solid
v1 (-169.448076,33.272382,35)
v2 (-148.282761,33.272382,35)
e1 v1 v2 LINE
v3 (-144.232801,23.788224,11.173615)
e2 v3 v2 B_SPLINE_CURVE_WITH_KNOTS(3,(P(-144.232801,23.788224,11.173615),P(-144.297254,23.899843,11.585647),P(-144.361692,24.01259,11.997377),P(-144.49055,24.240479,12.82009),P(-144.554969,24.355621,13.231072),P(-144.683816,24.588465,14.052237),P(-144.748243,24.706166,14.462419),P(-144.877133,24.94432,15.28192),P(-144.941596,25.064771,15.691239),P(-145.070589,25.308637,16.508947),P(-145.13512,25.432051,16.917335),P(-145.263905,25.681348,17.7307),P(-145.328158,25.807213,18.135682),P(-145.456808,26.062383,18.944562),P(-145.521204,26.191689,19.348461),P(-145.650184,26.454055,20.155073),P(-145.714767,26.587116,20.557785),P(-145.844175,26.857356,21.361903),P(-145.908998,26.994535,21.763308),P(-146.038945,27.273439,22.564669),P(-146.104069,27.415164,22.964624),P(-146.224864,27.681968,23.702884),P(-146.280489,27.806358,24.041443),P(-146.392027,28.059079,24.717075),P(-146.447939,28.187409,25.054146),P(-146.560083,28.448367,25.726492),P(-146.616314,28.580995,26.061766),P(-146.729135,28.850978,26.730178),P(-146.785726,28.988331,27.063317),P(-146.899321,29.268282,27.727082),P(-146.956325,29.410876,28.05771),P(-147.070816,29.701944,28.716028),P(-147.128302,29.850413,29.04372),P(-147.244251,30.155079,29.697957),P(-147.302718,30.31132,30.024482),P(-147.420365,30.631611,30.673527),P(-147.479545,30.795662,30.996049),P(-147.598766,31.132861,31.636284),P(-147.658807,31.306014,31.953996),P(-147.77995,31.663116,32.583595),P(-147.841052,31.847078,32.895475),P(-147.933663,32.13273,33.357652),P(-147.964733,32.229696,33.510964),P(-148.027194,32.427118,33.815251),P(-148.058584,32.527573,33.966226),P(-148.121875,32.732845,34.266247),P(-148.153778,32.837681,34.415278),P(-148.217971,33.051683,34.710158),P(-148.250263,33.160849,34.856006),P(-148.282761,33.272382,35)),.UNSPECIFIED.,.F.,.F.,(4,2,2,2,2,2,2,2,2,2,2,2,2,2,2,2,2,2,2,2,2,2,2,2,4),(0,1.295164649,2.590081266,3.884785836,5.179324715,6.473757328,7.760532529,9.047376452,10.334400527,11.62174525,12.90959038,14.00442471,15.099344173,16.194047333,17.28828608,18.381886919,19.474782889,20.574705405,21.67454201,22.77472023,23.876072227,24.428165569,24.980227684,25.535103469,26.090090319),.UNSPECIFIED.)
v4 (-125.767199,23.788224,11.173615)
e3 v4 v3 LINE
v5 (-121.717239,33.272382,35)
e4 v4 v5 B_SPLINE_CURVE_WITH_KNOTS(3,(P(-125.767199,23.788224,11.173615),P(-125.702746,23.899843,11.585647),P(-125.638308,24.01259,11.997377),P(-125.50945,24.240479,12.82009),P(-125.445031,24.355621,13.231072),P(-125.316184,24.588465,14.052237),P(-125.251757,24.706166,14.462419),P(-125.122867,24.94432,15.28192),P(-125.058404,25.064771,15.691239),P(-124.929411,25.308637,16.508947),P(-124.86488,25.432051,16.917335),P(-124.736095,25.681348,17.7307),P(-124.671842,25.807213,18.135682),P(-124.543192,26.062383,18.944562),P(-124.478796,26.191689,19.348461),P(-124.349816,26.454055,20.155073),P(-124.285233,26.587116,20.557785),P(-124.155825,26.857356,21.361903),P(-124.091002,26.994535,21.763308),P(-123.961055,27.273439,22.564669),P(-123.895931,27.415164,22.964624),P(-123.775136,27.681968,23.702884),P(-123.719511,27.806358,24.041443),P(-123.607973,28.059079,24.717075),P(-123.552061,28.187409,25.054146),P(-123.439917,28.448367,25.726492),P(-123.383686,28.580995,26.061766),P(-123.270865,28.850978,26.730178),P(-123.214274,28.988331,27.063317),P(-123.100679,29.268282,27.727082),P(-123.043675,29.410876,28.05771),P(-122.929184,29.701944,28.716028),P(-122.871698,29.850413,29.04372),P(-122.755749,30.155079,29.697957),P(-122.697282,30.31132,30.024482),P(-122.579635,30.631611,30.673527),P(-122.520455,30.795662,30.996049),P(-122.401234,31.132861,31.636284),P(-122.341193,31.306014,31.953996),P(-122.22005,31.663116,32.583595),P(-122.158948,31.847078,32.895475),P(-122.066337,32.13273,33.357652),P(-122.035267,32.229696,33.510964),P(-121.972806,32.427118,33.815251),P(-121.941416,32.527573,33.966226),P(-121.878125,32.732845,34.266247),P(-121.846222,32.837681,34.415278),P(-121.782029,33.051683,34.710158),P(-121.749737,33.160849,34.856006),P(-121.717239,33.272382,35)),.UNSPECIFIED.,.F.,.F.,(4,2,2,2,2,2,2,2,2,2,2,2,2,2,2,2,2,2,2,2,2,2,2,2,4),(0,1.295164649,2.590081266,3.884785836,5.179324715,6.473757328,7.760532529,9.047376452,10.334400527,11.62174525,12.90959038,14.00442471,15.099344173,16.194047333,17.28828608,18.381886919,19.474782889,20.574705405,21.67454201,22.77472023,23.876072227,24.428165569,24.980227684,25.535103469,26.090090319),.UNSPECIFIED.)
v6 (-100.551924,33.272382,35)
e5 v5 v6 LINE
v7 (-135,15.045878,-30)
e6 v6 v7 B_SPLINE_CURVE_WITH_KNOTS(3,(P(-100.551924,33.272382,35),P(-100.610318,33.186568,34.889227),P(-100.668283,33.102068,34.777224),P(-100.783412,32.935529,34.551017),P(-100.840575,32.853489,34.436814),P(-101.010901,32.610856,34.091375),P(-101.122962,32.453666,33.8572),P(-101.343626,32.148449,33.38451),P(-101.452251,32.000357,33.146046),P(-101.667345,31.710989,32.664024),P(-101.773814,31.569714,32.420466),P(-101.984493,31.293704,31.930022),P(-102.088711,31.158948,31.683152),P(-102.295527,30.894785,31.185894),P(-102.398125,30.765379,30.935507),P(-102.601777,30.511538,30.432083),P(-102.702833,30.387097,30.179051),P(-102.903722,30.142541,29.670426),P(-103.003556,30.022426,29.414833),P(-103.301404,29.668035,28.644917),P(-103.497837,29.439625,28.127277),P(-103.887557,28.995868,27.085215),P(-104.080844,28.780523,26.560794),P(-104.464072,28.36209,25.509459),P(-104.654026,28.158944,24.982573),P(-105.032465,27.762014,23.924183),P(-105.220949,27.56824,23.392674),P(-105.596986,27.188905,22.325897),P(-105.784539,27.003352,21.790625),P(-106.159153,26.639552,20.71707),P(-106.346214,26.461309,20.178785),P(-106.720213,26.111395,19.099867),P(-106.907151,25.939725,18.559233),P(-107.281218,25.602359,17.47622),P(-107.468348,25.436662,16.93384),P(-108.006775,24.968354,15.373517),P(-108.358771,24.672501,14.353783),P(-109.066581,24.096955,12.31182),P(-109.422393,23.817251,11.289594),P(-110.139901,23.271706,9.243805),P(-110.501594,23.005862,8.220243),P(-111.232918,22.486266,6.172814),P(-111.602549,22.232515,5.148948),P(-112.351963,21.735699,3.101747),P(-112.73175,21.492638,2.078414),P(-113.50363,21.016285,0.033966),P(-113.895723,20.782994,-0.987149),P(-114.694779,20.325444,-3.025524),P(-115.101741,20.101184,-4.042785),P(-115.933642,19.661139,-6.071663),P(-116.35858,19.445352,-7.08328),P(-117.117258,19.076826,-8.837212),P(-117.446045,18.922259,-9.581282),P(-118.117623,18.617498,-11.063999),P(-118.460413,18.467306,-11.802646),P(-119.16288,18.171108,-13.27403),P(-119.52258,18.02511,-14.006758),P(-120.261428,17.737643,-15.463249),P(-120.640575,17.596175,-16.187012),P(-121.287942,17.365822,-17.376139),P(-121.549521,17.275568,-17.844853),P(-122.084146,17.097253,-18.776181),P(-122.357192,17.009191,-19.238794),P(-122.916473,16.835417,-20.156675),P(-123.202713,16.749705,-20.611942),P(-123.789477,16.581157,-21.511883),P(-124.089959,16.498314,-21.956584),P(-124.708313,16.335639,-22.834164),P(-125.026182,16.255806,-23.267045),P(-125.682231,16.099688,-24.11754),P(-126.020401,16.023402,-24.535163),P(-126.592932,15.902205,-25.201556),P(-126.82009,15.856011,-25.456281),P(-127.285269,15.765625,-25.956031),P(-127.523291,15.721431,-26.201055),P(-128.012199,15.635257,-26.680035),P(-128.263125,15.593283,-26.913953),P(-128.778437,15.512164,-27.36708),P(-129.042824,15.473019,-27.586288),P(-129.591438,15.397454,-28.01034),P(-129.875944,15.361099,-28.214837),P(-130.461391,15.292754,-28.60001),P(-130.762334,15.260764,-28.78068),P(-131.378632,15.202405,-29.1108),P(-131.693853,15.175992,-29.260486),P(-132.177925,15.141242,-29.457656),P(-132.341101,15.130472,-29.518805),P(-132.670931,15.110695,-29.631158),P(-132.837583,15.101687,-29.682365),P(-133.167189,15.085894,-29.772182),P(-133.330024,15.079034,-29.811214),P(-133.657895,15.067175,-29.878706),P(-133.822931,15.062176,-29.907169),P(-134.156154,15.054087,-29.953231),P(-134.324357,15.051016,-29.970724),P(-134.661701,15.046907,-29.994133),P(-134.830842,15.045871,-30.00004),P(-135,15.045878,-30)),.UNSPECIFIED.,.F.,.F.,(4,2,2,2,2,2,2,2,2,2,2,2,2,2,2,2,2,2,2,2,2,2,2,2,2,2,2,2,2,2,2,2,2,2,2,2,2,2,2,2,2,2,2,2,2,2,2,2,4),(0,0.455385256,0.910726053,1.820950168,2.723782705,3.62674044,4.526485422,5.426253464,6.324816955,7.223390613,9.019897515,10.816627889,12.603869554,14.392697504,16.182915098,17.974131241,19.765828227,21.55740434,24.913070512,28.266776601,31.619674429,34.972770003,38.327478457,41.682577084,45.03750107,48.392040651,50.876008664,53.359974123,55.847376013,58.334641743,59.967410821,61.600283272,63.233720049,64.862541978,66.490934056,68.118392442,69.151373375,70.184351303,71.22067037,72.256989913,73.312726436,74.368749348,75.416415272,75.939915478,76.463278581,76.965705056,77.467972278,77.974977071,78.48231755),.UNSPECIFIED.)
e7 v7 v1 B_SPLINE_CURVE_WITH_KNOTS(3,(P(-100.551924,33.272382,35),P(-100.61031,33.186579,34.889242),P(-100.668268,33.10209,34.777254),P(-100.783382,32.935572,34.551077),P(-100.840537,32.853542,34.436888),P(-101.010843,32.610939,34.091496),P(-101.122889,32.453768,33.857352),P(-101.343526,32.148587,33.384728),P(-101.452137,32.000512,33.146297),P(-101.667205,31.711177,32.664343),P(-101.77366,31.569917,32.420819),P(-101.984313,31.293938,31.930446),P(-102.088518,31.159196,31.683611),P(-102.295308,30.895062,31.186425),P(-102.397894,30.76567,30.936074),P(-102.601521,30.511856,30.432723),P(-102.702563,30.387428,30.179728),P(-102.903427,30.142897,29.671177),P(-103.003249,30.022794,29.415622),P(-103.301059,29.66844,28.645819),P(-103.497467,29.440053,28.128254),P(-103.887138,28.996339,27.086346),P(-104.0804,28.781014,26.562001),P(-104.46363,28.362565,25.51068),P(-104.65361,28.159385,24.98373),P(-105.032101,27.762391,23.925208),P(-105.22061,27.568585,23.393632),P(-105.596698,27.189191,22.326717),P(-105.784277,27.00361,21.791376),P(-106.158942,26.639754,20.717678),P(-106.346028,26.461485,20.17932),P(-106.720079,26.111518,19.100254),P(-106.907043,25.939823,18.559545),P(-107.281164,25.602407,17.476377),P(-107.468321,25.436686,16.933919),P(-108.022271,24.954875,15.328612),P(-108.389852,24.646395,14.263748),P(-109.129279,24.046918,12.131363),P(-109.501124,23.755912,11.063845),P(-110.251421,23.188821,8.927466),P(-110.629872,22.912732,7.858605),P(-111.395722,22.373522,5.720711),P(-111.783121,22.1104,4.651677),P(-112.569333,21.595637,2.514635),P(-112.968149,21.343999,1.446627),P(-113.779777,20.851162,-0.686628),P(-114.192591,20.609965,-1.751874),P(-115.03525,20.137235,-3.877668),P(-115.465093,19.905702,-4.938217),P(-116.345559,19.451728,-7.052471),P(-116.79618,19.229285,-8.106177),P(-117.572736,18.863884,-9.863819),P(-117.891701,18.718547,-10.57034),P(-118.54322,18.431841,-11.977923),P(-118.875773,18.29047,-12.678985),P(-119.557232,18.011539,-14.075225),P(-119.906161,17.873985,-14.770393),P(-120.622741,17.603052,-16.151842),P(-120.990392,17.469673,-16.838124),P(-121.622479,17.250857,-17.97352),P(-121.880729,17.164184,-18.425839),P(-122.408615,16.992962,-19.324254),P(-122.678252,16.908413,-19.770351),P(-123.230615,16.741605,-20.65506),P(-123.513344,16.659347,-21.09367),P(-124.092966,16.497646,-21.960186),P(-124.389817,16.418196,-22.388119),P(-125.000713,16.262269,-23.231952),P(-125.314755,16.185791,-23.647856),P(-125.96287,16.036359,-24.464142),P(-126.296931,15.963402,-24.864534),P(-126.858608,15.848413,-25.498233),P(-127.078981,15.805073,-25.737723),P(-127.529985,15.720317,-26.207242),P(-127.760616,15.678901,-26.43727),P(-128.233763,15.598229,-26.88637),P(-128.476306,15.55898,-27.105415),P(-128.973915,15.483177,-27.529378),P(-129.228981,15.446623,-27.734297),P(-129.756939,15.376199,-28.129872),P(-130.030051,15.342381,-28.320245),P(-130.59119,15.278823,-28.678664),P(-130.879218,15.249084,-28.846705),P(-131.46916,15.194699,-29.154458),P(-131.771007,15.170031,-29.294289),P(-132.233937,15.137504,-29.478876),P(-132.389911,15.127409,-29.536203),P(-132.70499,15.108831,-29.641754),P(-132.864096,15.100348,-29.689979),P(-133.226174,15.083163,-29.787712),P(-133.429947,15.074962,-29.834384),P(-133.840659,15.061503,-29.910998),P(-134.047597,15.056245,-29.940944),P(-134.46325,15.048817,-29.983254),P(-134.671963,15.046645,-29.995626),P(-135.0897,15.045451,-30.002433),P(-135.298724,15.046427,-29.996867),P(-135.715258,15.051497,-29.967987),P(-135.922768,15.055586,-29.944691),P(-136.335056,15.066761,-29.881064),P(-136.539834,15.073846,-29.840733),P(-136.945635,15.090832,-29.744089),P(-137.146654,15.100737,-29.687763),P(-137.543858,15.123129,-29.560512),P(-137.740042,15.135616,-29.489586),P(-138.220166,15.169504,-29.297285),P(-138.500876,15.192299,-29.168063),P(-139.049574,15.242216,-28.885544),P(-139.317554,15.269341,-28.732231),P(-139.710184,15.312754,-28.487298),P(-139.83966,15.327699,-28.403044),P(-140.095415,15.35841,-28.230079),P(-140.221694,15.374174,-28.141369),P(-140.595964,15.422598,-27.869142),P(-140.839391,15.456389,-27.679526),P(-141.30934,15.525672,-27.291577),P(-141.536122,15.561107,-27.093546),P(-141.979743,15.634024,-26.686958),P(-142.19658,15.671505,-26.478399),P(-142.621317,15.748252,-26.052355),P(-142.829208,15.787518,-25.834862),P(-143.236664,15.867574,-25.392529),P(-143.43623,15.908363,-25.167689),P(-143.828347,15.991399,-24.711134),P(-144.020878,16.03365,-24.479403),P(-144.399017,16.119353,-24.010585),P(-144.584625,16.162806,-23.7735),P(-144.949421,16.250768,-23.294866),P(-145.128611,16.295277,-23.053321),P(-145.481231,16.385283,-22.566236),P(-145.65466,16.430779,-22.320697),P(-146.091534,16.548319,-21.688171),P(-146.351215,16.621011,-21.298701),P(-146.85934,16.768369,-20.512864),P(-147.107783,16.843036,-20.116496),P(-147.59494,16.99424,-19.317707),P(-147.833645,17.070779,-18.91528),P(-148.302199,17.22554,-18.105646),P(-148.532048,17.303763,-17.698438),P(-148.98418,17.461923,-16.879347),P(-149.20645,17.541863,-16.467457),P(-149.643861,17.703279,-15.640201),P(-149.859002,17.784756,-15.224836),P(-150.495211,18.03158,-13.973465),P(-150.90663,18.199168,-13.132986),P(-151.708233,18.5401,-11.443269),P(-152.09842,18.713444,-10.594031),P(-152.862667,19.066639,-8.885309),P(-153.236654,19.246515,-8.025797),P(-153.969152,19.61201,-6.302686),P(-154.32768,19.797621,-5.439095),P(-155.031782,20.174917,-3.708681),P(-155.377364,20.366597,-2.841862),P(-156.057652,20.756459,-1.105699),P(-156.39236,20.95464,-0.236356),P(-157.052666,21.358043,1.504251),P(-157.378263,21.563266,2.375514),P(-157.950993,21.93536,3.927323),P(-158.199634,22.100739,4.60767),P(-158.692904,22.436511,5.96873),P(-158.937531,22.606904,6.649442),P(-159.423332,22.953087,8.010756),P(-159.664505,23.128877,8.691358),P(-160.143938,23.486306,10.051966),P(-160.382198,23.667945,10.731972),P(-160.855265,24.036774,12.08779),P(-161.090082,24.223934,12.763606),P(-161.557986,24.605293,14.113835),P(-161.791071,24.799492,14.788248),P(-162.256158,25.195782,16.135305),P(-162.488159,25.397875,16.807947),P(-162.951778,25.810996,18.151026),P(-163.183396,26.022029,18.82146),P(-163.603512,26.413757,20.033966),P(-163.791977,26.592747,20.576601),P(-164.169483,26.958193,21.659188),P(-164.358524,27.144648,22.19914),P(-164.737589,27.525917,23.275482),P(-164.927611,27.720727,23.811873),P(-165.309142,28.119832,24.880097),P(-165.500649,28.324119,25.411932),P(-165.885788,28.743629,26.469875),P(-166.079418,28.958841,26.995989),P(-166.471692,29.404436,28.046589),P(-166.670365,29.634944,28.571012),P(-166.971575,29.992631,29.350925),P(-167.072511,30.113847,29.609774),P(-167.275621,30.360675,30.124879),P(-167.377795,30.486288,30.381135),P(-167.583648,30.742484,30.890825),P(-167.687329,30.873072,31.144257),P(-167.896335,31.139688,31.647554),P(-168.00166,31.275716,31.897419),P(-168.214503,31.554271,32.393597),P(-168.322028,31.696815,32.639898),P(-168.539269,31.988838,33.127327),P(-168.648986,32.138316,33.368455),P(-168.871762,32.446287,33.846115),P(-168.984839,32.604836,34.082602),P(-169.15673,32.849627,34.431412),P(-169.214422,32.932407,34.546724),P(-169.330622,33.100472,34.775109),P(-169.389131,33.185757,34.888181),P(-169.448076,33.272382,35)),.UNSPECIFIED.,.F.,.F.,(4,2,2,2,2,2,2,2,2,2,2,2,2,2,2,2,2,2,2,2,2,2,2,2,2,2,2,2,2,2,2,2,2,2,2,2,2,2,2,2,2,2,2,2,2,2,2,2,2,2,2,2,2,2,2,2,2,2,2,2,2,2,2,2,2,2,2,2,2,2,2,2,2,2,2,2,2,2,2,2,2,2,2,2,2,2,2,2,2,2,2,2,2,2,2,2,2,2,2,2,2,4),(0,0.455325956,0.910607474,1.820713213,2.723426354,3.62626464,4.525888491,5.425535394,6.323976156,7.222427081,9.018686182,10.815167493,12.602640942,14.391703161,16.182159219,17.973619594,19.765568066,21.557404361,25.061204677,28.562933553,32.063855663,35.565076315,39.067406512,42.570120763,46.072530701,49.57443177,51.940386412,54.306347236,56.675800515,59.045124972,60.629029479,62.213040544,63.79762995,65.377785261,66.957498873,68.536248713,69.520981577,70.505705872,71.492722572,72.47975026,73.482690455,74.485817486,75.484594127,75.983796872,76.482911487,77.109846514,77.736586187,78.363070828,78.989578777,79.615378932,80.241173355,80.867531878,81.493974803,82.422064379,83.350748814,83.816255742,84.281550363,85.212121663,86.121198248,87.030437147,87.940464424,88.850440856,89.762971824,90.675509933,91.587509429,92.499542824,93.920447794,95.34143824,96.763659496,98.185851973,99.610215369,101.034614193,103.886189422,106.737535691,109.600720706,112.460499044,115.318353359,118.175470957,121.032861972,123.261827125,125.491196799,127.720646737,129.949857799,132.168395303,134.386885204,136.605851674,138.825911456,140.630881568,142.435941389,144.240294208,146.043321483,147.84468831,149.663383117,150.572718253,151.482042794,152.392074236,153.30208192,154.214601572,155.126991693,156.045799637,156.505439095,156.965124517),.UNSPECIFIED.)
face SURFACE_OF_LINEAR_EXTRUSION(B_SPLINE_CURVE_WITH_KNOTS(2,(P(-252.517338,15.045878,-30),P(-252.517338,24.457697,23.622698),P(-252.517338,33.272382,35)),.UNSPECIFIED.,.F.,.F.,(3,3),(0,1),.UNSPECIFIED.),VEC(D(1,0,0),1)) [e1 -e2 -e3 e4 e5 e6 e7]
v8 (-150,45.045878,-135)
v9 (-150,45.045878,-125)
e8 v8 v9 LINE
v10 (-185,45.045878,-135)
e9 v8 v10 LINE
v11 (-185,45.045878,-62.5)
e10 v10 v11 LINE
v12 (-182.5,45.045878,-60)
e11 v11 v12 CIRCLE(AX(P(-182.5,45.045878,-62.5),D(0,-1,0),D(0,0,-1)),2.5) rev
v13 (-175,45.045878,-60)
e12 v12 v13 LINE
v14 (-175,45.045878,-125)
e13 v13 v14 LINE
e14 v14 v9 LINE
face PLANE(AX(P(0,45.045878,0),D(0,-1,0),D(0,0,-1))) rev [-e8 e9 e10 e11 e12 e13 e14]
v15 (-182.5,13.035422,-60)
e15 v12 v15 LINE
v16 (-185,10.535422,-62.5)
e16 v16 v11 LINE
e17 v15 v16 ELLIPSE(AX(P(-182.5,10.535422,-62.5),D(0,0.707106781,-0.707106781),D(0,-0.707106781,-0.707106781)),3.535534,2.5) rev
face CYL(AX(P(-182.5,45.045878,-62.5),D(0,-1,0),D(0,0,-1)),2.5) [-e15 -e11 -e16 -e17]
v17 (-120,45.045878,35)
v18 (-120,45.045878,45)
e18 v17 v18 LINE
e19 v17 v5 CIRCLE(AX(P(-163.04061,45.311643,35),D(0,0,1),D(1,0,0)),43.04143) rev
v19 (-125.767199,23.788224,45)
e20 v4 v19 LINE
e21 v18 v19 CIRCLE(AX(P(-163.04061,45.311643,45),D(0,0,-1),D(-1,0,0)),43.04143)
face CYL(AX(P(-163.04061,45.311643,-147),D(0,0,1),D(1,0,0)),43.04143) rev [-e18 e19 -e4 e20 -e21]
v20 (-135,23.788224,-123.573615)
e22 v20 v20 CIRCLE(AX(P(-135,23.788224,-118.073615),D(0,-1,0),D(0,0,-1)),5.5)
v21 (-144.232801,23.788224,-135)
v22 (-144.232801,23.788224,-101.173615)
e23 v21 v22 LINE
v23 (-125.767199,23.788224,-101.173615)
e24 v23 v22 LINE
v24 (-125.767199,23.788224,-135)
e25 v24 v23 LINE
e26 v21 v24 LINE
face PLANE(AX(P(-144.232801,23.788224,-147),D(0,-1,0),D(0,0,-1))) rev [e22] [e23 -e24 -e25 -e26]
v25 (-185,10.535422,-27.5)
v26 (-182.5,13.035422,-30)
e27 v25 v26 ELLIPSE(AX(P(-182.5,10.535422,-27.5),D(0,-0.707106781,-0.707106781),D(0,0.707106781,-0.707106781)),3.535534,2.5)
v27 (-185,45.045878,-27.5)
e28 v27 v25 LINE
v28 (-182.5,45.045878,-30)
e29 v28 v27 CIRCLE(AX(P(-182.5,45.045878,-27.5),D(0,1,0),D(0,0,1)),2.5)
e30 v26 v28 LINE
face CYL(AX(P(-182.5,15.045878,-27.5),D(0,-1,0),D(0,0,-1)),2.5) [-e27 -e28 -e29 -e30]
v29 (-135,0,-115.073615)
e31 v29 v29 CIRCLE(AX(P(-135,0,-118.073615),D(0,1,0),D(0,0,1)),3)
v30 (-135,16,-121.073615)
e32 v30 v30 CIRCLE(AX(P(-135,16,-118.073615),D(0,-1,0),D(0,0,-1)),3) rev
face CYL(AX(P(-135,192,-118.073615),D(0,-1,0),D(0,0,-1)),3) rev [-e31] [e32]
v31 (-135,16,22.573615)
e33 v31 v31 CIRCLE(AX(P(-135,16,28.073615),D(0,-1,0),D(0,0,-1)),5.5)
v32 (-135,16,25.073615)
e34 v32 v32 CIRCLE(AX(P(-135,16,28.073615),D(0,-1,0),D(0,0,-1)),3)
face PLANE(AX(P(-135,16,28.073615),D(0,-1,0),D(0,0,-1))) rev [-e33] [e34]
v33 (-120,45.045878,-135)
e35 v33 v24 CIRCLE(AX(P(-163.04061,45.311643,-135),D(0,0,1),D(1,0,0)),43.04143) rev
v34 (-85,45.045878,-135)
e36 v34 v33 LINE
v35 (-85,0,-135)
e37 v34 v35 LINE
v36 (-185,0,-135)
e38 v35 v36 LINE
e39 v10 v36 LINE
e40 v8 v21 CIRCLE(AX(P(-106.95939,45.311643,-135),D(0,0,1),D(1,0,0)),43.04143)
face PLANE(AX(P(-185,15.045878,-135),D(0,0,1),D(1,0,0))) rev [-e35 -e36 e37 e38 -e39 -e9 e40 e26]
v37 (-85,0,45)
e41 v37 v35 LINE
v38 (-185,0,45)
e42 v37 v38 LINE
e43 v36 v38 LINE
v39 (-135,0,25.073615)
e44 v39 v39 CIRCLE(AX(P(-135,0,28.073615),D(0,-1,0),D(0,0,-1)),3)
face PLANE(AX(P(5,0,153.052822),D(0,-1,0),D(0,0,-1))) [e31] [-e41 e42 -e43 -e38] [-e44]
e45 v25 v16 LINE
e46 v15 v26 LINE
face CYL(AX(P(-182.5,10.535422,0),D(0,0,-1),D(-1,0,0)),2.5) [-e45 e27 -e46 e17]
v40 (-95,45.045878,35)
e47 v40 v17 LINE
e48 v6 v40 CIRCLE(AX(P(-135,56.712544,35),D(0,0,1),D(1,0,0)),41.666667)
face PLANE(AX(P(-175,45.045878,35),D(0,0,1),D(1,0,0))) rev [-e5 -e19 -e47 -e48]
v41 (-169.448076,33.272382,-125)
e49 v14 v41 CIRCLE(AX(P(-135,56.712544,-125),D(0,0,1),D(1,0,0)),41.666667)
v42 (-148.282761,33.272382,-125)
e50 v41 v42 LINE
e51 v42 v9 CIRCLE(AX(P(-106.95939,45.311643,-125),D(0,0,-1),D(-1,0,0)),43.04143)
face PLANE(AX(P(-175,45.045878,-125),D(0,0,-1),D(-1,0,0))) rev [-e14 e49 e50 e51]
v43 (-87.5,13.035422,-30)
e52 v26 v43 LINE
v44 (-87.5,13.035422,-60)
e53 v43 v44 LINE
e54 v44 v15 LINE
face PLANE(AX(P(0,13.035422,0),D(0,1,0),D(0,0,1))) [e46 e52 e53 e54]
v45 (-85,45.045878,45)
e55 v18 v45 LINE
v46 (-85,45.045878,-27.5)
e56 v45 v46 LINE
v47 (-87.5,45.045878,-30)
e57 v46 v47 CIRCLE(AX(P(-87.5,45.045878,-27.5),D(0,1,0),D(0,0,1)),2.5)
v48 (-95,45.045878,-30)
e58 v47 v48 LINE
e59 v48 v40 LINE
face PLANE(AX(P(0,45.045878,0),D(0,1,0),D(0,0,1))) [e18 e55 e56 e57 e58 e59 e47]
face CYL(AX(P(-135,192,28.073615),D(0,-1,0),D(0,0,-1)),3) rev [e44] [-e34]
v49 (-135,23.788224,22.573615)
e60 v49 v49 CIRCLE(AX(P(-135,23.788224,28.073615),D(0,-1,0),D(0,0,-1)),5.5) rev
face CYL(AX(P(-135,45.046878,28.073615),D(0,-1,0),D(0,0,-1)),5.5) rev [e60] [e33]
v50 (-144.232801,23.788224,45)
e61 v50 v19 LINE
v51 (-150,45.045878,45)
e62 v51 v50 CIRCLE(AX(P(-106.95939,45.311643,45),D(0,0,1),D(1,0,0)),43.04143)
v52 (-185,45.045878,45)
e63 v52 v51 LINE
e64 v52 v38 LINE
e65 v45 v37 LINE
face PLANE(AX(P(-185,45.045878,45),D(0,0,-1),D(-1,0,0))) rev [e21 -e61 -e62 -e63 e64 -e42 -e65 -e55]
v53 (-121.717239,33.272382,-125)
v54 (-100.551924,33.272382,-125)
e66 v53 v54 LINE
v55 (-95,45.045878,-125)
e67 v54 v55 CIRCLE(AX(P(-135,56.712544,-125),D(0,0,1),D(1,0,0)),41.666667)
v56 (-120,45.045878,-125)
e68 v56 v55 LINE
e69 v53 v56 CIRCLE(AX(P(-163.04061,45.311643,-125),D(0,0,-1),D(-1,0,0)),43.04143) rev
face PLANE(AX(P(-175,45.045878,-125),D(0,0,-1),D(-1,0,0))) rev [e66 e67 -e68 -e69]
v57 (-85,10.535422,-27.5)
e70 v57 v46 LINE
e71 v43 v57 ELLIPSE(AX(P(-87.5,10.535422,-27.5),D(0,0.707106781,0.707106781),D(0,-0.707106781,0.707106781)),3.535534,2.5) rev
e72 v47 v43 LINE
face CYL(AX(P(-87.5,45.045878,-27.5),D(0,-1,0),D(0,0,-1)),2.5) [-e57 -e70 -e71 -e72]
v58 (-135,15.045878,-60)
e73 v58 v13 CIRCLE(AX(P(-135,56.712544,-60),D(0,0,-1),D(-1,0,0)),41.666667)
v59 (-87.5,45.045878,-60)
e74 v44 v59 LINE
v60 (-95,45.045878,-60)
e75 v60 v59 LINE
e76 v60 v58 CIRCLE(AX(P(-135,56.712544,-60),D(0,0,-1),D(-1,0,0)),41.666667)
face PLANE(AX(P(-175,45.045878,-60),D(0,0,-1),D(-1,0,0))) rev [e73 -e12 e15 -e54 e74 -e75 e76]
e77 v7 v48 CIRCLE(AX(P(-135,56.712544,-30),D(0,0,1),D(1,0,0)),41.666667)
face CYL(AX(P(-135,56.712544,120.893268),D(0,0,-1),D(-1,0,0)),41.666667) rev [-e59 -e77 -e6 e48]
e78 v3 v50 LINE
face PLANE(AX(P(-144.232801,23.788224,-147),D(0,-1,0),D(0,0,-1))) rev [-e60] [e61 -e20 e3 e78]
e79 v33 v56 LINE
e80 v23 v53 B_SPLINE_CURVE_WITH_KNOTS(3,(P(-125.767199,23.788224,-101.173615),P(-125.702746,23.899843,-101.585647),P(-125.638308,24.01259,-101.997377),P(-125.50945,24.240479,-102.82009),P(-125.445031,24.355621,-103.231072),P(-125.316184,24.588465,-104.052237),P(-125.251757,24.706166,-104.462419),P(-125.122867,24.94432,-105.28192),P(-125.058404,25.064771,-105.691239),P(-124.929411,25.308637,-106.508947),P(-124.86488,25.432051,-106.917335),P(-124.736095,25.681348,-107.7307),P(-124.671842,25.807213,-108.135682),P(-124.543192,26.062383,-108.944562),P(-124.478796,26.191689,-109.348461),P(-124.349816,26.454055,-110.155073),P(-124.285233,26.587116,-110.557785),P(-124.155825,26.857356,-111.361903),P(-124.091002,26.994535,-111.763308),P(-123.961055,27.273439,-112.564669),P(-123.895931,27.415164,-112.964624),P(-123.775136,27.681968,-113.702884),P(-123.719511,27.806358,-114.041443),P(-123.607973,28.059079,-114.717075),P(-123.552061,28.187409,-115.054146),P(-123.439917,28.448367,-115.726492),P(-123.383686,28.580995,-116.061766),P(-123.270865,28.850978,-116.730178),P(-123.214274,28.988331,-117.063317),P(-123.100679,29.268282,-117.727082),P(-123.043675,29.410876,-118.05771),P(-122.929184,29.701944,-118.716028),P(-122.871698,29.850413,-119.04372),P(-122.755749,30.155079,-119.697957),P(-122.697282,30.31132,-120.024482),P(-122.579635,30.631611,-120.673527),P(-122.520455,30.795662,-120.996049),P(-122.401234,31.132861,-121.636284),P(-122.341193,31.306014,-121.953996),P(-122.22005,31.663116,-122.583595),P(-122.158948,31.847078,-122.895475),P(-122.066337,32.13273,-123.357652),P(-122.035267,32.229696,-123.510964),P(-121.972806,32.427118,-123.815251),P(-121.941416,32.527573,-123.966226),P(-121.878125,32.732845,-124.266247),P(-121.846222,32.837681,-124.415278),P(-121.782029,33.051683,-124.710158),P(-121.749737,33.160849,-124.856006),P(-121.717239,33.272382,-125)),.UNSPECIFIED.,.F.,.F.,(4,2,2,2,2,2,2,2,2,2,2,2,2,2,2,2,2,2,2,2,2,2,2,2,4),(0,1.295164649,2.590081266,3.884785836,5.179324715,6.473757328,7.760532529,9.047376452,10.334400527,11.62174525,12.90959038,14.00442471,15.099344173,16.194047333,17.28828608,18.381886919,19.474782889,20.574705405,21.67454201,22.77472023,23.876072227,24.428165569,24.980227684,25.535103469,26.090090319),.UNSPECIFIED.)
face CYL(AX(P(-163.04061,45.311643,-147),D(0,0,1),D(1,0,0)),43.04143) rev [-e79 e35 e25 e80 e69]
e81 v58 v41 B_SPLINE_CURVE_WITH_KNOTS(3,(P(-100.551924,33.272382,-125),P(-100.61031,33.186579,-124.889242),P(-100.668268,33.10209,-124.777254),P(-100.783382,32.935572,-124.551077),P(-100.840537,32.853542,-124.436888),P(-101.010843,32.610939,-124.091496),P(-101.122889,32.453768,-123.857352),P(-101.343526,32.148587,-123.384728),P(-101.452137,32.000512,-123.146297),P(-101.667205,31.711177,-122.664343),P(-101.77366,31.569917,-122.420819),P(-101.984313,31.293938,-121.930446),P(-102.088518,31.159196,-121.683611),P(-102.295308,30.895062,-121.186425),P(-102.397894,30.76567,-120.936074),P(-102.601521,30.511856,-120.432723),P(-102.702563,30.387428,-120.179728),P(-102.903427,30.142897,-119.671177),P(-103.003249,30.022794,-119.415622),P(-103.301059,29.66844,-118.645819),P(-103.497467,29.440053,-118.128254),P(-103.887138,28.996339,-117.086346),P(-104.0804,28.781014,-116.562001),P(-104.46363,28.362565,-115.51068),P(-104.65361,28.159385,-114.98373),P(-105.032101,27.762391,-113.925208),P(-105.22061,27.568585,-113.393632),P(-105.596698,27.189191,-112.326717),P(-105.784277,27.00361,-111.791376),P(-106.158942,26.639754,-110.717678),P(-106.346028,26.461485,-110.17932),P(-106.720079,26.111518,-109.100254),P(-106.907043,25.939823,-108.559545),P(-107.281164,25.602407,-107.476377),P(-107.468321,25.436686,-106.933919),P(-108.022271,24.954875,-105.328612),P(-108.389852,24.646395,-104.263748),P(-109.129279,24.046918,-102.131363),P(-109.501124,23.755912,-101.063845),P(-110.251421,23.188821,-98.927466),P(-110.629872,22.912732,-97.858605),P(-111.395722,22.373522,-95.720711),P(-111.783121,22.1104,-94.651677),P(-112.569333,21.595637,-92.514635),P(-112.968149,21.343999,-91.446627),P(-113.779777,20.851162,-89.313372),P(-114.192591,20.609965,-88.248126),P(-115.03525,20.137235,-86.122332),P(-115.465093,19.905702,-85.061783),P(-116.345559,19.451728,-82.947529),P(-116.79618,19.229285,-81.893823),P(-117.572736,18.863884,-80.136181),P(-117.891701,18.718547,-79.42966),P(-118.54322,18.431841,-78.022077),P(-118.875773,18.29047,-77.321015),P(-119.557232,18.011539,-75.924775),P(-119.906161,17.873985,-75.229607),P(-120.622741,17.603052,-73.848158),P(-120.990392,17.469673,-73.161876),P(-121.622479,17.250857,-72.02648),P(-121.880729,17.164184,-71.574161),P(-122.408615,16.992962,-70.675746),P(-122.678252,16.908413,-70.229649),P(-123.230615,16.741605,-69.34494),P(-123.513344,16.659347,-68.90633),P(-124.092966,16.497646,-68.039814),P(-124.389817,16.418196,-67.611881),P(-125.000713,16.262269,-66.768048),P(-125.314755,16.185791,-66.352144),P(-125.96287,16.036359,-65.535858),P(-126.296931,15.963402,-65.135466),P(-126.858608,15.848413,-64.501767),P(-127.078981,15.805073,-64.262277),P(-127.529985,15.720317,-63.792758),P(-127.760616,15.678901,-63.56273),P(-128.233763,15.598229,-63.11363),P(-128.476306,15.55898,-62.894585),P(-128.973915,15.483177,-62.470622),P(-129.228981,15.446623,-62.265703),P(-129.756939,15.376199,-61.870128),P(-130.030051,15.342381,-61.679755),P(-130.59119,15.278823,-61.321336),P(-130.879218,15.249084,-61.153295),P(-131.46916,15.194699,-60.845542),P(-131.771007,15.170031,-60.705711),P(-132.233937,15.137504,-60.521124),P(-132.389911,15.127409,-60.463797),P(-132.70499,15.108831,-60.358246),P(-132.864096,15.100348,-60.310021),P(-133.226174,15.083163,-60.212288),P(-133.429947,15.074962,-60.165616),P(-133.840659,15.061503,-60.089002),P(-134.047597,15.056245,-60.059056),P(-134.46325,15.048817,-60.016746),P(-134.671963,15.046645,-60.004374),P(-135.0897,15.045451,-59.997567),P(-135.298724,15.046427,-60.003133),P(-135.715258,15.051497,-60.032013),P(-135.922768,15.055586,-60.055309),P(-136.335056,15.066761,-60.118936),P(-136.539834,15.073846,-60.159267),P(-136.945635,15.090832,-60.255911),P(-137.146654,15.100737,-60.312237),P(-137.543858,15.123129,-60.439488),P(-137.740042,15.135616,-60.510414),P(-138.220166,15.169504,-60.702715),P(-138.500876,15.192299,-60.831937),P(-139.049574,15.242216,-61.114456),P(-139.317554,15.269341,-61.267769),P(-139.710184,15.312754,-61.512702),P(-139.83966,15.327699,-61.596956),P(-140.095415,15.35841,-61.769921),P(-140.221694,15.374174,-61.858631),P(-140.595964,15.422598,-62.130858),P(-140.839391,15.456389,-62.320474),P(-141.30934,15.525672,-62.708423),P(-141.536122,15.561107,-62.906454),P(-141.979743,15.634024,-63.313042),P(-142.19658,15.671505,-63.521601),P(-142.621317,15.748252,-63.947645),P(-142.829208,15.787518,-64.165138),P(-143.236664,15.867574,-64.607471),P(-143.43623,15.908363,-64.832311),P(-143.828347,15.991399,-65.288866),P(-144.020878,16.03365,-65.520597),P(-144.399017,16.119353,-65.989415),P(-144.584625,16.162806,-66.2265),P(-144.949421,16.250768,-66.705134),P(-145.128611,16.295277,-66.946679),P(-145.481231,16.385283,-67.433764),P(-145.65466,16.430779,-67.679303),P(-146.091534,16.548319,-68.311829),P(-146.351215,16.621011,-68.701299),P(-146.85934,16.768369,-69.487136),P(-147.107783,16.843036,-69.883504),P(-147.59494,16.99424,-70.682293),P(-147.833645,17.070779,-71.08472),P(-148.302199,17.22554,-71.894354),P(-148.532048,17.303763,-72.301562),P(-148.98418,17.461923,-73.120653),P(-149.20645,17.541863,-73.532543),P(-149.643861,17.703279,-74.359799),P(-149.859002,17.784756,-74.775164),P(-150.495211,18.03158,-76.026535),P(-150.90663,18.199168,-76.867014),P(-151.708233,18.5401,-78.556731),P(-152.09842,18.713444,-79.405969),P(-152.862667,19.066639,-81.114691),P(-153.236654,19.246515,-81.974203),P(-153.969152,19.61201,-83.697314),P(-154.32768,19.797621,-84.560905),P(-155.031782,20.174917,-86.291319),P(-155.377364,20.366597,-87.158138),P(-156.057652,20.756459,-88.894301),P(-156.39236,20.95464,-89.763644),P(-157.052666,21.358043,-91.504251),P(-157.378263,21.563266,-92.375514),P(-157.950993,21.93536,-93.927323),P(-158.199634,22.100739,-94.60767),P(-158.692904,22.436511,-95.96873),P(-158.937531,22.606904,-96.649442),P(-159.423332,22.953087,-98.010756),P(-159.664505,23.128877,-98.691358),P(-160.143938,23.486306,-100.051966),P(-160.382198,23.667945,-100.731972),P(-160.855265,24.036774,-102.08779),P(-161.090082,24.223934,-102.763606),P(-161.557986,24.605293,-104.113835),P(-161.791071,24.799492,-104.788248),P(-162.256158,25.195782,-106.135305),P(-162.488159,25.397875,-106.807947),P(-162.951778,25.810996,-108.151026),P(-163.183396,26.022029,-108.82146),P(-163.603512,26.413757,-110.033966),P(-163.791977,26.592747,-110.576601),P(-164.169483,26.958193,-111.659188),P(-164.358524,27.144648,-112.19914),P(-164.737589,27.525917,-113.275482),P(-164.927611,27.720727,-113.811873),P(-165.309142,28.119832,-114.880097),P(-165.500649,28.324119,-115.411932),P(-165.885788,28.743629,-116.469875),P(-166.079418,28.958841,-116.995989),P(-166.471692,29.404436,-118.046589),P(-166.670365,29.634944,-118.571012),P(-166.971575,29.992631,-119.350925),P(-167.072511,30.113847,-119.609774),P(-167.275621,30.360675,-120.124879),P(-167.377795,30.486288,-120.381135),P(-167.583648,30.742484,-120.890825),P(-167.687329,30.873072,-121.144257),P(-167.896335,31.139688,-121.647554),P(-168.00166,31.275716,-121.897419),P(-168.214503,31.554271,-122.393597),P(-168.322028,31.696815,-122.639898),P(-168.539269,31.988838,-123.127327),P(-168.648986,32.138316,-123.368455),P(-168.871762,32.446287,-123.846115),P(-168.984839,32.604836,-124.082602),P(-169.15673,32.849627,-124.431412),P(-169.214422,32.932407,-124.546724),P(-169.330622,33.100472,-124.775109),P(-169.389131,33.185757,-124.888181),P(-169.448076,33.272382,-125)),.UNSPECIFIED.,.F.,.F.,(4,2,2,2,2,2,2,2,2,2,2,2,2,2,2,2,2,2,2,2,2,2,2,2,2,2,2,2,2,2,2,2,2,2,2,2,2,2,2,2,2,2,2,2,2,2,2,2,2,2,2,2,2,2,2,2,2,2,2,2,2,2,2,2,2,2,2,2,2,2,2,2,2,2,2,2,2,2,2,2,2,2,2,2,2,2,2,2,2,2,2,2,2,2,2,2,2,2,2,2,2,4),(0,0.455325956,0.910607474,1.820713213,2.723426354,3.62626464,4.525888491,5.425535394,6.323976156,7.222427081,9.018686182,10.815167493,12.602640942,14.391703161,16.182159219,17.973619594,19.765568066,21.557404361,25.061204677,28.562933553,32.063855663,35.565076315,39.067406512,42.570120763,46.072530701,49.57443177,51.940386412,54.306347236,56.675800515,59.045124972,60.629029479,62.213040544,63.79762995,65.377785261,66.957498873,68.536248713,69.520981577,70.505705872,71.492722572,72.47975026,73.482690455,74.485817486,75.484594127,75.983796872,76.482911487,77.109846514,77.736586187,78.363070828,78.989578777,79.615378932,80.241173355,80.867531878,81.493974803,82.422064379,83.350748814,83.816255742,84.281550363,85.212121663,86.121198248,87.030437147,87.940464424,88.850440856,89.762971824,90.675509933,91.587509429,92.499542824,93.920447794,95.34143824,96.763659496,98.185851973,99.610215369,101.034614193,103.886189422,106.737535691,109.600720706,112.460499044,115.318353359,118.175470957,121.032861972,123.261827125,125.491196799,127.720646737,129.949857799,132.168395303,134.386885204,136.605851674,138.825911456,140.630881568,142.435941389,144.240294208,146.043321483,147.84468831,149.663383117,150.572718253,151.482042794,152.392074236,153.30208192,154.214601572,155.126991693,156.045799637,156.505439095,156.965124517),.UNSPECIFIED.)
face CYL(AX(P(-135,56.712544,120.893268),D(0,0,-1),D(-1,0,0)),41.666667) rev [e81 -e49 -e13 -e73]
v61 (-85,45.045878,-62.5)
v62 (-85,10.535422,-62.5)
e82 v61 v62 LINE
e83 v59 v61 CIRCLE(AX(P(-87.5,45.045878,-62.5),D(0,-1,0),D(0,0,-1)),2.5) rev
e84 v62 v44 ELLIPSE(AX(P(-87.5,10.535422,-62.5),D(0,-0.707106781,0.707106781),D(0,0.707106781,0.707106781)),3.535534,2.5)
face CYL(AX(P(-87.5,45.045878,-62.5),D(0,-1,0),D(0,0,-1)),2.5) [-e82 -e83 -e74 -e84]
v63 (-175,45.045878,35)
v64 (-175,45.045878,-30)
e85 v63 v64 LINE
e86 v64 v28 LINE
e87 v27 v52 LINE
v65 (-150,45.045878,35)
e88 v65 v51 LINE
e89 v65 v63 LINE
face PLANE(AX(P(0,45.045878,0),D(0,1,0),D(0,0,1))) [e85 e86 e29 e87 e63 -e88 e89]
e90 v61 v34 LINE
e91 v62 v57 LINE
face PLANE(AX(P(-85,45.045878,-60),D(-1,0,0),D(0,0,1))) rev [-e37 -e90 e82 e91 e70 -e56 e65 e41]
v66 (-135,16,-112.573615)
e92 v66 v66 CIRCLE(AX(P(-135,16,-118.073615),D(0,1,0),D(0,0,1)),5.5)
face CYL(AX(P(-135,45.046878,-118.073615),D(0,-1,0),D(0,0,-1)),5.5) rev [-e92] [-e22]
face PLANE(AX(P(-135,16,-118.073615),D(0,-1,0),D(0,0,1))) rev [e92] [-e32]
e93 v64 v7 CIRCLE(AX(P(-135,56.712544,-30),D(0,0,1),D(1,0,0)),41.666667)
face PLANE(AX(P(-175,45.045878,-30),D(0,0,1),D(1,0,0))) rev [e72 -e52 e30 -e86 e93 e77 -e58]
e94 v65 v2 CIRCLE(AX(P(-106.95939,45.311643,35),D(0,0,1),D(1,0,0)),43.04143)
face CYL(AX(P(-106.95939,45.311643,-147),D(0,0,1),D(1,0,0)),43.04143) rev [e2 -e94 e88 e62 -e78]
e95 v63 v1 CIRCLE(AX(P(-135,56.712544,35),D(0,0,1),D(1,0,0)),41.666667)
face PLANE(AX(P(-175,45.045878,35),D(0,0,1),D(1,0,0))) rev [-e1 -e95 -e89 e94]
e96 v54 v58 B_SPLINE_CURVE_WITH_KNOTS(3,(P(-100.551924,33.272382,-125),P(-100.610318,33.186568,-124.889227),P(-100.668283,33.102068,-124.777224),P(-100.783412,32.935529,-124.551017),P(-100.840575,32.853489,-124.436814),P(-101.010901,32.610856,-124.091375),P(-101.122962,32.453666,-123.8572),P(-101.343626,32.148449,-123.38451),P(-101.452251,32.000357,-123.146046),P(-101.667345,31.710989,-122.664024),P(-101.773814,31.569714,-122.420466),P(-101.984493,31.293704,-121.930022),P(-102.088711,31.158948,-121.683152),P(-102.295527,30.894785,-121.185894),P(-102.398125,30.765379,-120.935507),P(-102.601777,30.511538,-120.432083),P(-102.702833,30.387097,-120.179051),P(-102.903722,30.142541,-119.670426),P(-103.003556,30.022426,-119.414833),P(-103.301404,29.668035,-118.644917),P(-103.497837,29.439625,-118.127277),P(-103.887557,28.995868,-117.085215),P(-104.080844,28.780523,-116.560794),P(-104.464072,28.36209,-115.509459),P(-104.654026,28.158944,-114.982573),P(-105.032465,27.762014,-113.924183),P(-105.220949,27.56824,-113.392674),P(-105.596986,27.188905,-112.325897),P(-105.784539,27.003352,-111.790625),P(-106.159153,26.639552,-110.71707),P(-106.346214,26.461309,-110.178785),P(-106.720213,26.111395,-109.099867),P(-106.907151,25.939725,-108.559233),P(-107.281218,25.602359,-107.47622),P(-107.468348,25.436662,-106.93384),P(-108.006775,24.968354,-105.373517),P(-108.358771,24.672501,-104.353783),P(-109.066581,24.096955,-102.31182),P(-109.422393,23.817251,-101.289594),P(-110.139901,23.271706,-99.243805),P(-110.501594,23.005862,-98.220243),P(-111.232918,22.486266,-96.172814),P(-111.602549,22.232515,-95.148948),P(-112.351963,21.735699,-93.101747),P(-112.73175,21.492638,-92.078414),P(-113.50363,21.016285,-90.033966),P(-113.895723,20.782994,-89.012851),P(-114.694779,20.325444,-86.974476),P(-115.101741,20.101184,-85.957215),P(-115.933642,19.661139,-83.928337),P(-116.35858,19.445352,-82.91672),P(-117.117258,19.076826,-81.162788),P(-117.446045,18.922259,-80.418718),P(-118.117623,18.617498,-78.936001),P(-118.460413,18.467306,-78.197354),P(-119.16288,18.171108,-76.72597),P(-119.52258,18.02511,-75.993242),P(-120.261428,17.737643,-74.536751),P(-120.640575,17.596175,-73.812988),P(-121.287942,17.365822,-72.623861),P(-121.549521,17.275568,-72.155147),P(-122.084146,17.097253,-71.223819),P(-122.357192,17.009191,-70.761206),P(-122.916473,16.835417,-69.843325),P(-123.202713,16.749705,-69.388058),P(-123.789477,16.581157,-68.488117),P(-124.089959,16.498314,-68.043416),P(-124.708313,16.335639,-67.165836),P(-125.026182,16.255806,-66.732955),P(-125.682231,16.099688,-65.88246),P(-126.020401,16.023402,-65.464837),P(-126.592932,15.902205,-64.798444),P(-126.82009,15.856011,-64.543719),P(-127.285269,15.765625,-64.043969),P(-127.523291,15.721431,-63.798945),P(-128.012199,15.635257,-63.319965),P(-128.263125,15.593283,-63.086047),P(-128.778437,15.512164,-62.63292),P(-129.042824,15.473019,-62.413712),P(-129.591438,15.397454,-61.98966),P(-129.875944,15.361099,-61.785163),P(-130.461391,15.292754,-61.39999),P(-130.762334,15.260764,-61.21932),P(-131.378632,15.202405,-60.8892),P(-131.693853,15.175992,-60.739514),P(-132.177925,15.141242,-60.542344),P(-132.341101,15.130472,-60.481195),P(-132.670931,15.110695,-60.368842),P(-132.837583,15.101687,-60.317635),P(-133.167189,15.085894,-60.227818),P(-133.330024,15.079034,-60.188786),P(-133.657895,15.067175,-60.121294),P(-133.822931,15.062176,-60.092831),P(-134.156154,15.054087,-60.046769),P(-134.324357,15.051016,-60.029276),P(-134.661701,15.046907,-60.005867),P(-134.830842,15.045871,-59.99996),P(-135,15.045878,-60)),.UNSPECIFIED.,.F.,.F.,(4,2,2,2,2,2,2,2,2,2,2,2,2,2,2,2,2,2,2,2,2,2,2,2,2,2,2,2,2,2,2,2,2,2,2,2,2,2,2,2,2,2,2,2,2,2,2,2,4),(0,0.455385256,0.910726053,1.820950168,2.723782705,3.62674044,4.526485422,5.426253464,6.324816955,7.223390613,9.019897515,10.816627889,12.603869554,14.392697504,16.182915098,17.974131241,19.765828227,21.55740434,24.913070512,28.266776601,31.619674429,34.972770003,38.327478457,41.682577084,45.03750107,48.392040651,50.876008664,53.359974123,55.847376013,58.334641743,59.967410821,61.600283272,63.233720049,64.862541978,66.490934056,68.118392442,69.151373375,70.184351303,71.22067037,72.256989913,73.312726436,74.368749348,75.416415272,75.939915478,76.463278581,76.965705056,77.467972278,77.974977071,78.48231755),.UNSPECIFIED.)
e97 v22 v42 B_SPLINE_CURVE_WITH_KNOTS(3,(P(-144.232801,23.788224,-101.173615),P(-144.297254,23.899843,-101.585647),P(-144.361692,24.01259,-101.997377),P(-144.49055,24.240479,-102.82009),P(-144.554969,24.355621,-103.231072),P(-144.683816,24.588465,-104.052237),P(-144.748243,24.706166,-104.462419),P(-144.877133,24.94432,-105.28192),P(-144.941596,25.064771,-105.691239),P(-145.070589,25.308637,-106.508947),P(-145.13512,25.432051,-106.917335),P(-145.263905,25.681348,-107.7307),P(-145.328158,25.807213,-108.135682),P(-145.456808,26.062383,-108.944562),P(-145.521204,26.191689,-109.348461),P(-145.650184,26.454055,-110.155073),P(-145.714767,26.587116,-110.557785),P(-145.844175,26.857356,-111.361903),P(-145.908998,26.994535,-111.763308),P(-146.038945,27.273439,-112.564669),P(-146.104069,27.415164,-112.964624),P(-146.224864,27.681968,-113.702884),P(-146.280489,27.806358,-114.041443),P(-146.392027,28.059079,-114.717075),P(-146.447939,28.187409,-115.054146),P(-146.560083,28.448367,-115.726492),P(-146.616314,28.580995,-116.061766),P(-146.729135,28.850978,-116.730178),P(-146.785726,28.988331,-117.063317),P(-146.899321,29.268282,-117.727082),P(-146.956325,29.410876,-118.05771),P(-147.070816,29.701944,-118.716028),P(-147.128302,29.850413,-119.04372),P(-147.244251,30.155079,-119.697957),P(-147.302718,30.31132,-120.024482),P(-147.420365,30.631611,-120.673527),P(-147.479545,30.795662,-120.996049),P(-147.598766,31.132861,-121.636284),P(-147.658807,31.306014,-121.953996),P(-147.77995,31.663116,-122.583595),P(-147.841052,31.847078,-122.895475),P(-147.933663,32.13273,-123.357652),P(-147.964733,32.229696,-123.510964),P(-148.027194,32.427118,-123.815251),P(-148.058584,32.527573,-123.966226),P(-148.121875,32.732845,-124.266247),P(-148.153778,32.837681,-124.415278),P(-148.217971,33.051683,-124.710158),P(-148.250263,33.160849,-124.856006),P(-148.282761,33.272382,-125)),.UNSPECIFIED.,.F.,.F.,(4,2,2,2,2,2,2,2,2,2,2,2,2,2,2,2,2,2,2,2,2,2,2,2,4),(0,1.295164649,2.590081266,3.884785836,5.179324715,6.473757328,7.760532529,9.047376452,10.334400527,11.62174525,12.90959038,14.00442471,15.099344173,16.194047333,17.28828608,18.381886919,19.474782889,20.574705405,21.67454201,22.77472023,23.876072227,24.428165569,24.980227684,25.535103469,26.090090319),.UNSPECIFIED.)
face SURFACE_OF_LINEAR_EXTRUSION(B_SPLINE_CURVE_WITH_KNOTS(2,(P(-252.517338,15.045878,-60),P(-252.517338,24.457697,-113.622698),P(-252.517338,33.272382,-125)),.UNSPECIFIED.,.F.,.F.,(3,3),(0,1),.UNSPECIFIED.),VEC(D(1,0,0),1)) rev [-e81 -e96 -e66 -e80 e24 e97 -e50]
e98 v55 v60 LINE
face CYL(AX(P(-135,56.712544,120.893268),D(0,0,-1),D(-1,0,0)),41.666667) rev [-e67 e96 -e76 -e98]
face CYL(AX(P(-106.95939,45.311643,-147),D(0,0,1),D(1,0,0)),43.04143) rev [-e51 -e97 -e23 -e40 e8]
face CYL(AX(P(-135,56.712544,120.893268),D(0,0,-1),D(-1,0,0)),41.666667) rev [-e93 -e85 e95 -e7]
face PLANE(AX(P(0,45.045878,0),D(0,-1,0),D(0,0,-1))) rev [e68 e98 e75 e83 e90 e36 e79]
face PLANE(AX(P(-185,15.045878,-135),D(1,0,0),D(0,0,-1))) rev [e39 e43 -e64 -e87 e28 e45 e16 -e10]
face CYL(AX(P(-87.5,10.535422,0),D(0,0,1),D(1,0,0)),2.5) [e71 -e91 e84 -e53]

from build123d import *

# Parameters (mm, degrees)
BOSS_EXTRUDE1_DEPTH     = 15.045877519
BOSS_EXTRUDE2_DEPTH     = 30
BOSS_EXTRUDE3_DEPTH     = 160
CUT_EXTRUDE1_DEPTH      = 397.42670329
CUT_EXTRUDE1_DEPTH_BACK = 397.42670329
SKETCH5_W               = 30
SKETCH5_H               = 30
CUT_EXTRUDE2_START      = -30
CUT_EXTRUDE2_DEPTH      = 30
CUT_EXTRUDE3_DEPTH      = 2.010455065
BOSS_EXTRUDE6_START     = -34.448076
BOSS_EXTRUDE6_DEPTH     = 68.896152
SKETCH13_W              = 15
SKETCH13_H              = 30
BOSS_EXTRUDE7_DEPTH     = 10
SKETCH14_W              = 15
SKETCH14_H              = 30
BOSS_EXTRUDE8_DEPTH     = 10
CUT_EXTRUDE6_DEPTH      = 192
SKETCH18_R              = 3
CUT_EXTRUDE7_DEPTH      = 192
CUT_EXTRUDE8_REACH      = 232.854
SKETCH19_R              = 5.5
FILLET2_R               = 2.5


# Read off the part's stored shape, not the designer's step: Boss-Extrude3
with BuildPart() as part:
    # Sketch1 → Boss-Extrude1 (new body)
    with BuildSketch(Plane(origin=(0, 0, 0), x_dir=(1, 0, 0), z_dir=(0, 1, 0))):
        with BuildLine():
            Line((-185, -65), (5, -65))
            ThreePointArc((5, -65), (60.514401442, -84.704810384), (91.182336182, -135))
            Line((91.182336182, -135), (185, -135))
            Line((185, -135), (185, 135))
            Line((185, 135), (-185, 135))
            Line((-185, 135), (-185, -65))
        make_face()
    extrude(amount=BOSS_EXTRUDE1_DEPTH)

    # Sketch2 → Boss-Extrude2 (add)
    with BuildSketch(Plane(origin=(0, 15.045877519, 0), x_dir=(1, 0, 0), z_dir=(0, 1, 0))):
        Polygon((-175, -35), (-175, 30), (-185, 30), (-185, -45), (-142.5, -45), (-142.5, -35), align=None)
        Polygon((-175, 125), (-142.5, 125), (-142.5, 135), (-185, 135), (-185, 60), (-175, 60), align=None)
        Polygon((-95, -35), (-95, 30), (-85, 30), (-85, -45), (-127.5, -45), (-127.5, -35), align=None)
        Polygon((-127.5, 135), (-127.5, 125), (-95, 125), (-95, 60), (-85, 60), (-85, 135), align=None)
    extrude(amount=BOSS_EXTRUDE2_DEPTH)

    # Boss-Extrude3 outline → Boss-Extrude3 (add)
    with BuildSketch(Plane.XY.offset(-125)):
        with BuildLine():
            ThreePointArc((-95, 45.045877519), (-110, 23.379210852), (-135, 15.045877519))
            Line((-135, 15.045877519), (-95, 15.045877519))
            Line((-95, 15.045877519), (-95, 45.045877519))
        make_face()
        with BuildLine():
            Line((-175, 45.045877519), (-175, 15.045877519))
            Line((-175, 15.045877519), (-135, 15.045877519))
            ThreePointArc((-135, 15.045877519), (-160, 23.379210852), (-175, 45.045877519))
        make_face()
    extrude(amount=BOSS_EXTRUDE3_DEPTH)

    # Sketch5 → Cut-Extrude1 (cut, two sides: drawn at the far end of the back side and taken through both)
    with BuildSketch(Plane.ZY.offset(185).offset(-CUT_EXTRUDE1_DEPTH_BACK)):
        with Locations((-45, 30.045877519)):
            Rectangle(SKETCH5_W, SKETCH5_H)
    extrude(amount=CUT_EXTRUDE1_DEPTH + CUT_EXTRUDE1_DEPTH_BACK, mode=Mode.SUBTRACT)

    # Sketch6 → Cut-Extrude2 (cut)
    with BuildSketch(Plane(origin=(0, 15.045877519, 0), x_dir=(1, 0, 0), z_dir=(0, 1, 0)).offset(CUT_EXTRUDE2_START)):
        with BuildLine():
            Line((-85, 135), (-85, 60))
            Line((-85, 60), (-85, 30))
            Line((-85, 30), (-85, -45))
            Line((-85, -45), (-127.5, -45))
            Line((-127.5, -45), (-142.5, -45))
            Line((-142.5, -45), (-185, -45))
            Line((-185, -45), (-185, -65))
            Line((-185, -65), (5, -65))
            ThreePointArc((5, -65), (60.514401442, -84.704810384), (91.182336182, -135))
            Line((91.182336182, -135), (185, -135))
            Line((185, -135), (185, 135))
            Line((185, 135), (-85, 135))
        make_face()
    extrude(amount=CUT_EXTRUDE2_DEPTH, mode=Mode.SUBTRACT)

    # Sketch8 → Cut-Extrude3 (cut)
    with BuildSketch(Plane(origin=(0, 15.045877519, 0), x_dir=(1, 0, 0), z_dir=(0, 1, 0))):
        Polygon((-135, 60), (-185, 60), (-185, 30), (-135, 30), (-85, 30), (-85, 60), align=None)
    extrude(amount=-CUT_EXTRUDE3_DEPTH, mode=Mode.SUBTRACT)

    # Sketch12 → Boss-Extrude6 (add)
    with BuildSketch(Plane(origin=(-135, 0, 0), x_dir=(0, 0, -1), z_dir=(1, 0, 0)).offset(BOSS_EXTRUDE6_START)):
        with BuildLine():
            Line((-35, 33.272382456), (-35, 15.00790917))
            Line((-35, 15.00790917), (30, 15.045877519))
            add(Edge.make_bspline(
                [(-35, 33.272382456), (-23.622698209, 24.45769668), (30, 15.045877519)],
                knots=[0, 0, 0, 1, 1, 1], degree=2))
        make_face()
    boss_extrude6 = extrude(amount=BOSS_EXTRUDE6_DEPTH)

    # Sketch13 → Boss-Extrude7 (add)
    with BuildSketch(Plane.XY.offset(45)):
        with Locations((-135, 30.045877519)):
            Rectangle(SKETCH13_W, SKETCH13_H)
    extrude(amount=-BOSS_EXTRUDE7_DEPTH)

    # Sketch14 → Boss-Extrude8 (add)
    with BuildSketch(Plane(origin=(0, 0, -135), x_dir=(-1, 0, 0), z_dir=(0, 0, -1))):
        with Locations((135, 30.045877519)):
            Rectangle(SKETCH14_W, SKETCH14_H)
    extrude(amount=-BOSS_EXTRUDE8_DEPTH)

    # Mirror3: Boss-Extrude6 across plane
    add(boss_extrude6.mirror(Plane.XY.offset(-45)))

    # Sketch9 → Cut-Extrude6 (cut)
    with BuildSketch(Plane.XY.offset(45)):
        with BuildLine():
            Line((-150, 45.045877519), (-120, 45.045877519))
            ThreePointArc((-120, 45.045877519), (-121.500780237, 34.041891851), (-125.767198961, 23.788223571))
            Line((-125.767198961, 23.788223571), (-144.232801039, 23.788223571))
            ThreePointArc((-144.232801039, 23.788223571), (-148.499219763, 34.041891851), (-150, 45.045877519))
        make_face()
    extrude(amount=-CUT_EXTRUDE6_DEPTH, mode=Mode.SUBTRACT)

    # Sketch18 → Cut-Extrude7 (cut)
    with BuildSketch(Plane.XZ):
        with Locations(Location((-135, 28.073614807, 0), (0, 0, 270))):
            Circle(SKETCH18_R)
    cut_extrude7 = extrude(amount=-CUT_EXTRUDE7_DEPTH, mode=Mode.SUBTRACT)

    # Sketch19 → Cut-Extrude8 (cut, up to next)
    with BuildSketch(Plane(origin=(0, 16, 0), x_dir=(-1, 0, 0), z_dir=(0, -1, 0)), mode=Mode.PRIVATE) as cut_extrude8_sk1:
        with Locations(Location((135, -28.073614807, 0), (0, 0, 90))):
            Circle(SKETCH19_R)
    cut_extrude8_tool1 = extrude(cut_extrude8_sk1.sketch, amount=-CUT_EXTRUDE8_REACH, mode=Mode.PRIVATE) & part.part
    cut_extrude8 = cut_extrude8_tool1.solids().sort_by_distance((-135, 16, 28.073615))[0]
    add(cut_extrude8, mode=Mode.SUBTRACT)

    # Mirror4: Cut-Extrude7, Cut-Extrude8 across plane
    add(cut_extrude7.mirror(Plane.XY.offset(-45)), mode=Mode.SUBTRACT)
    add(cut_extrude8.mirror(Plane.XY.offset(-45)), mode=Mode.SUBTRACT)

    # Fillet2
    fillet2_edges = [part.edges().sort_by_distance(p)[0] for p in [
        (-85, 13.035422455, -45),
        (-185, 13.035422455, -45),
        (-185, 29.040649987, -30),
        (-185, 29.040649987, -60),
        (-85, 29.040649987, -60),
        (-85, 29.040649987, -30),
    ]]
    fillet(fillet2_edges, radius=FILLET2_R)


solid = part.part
